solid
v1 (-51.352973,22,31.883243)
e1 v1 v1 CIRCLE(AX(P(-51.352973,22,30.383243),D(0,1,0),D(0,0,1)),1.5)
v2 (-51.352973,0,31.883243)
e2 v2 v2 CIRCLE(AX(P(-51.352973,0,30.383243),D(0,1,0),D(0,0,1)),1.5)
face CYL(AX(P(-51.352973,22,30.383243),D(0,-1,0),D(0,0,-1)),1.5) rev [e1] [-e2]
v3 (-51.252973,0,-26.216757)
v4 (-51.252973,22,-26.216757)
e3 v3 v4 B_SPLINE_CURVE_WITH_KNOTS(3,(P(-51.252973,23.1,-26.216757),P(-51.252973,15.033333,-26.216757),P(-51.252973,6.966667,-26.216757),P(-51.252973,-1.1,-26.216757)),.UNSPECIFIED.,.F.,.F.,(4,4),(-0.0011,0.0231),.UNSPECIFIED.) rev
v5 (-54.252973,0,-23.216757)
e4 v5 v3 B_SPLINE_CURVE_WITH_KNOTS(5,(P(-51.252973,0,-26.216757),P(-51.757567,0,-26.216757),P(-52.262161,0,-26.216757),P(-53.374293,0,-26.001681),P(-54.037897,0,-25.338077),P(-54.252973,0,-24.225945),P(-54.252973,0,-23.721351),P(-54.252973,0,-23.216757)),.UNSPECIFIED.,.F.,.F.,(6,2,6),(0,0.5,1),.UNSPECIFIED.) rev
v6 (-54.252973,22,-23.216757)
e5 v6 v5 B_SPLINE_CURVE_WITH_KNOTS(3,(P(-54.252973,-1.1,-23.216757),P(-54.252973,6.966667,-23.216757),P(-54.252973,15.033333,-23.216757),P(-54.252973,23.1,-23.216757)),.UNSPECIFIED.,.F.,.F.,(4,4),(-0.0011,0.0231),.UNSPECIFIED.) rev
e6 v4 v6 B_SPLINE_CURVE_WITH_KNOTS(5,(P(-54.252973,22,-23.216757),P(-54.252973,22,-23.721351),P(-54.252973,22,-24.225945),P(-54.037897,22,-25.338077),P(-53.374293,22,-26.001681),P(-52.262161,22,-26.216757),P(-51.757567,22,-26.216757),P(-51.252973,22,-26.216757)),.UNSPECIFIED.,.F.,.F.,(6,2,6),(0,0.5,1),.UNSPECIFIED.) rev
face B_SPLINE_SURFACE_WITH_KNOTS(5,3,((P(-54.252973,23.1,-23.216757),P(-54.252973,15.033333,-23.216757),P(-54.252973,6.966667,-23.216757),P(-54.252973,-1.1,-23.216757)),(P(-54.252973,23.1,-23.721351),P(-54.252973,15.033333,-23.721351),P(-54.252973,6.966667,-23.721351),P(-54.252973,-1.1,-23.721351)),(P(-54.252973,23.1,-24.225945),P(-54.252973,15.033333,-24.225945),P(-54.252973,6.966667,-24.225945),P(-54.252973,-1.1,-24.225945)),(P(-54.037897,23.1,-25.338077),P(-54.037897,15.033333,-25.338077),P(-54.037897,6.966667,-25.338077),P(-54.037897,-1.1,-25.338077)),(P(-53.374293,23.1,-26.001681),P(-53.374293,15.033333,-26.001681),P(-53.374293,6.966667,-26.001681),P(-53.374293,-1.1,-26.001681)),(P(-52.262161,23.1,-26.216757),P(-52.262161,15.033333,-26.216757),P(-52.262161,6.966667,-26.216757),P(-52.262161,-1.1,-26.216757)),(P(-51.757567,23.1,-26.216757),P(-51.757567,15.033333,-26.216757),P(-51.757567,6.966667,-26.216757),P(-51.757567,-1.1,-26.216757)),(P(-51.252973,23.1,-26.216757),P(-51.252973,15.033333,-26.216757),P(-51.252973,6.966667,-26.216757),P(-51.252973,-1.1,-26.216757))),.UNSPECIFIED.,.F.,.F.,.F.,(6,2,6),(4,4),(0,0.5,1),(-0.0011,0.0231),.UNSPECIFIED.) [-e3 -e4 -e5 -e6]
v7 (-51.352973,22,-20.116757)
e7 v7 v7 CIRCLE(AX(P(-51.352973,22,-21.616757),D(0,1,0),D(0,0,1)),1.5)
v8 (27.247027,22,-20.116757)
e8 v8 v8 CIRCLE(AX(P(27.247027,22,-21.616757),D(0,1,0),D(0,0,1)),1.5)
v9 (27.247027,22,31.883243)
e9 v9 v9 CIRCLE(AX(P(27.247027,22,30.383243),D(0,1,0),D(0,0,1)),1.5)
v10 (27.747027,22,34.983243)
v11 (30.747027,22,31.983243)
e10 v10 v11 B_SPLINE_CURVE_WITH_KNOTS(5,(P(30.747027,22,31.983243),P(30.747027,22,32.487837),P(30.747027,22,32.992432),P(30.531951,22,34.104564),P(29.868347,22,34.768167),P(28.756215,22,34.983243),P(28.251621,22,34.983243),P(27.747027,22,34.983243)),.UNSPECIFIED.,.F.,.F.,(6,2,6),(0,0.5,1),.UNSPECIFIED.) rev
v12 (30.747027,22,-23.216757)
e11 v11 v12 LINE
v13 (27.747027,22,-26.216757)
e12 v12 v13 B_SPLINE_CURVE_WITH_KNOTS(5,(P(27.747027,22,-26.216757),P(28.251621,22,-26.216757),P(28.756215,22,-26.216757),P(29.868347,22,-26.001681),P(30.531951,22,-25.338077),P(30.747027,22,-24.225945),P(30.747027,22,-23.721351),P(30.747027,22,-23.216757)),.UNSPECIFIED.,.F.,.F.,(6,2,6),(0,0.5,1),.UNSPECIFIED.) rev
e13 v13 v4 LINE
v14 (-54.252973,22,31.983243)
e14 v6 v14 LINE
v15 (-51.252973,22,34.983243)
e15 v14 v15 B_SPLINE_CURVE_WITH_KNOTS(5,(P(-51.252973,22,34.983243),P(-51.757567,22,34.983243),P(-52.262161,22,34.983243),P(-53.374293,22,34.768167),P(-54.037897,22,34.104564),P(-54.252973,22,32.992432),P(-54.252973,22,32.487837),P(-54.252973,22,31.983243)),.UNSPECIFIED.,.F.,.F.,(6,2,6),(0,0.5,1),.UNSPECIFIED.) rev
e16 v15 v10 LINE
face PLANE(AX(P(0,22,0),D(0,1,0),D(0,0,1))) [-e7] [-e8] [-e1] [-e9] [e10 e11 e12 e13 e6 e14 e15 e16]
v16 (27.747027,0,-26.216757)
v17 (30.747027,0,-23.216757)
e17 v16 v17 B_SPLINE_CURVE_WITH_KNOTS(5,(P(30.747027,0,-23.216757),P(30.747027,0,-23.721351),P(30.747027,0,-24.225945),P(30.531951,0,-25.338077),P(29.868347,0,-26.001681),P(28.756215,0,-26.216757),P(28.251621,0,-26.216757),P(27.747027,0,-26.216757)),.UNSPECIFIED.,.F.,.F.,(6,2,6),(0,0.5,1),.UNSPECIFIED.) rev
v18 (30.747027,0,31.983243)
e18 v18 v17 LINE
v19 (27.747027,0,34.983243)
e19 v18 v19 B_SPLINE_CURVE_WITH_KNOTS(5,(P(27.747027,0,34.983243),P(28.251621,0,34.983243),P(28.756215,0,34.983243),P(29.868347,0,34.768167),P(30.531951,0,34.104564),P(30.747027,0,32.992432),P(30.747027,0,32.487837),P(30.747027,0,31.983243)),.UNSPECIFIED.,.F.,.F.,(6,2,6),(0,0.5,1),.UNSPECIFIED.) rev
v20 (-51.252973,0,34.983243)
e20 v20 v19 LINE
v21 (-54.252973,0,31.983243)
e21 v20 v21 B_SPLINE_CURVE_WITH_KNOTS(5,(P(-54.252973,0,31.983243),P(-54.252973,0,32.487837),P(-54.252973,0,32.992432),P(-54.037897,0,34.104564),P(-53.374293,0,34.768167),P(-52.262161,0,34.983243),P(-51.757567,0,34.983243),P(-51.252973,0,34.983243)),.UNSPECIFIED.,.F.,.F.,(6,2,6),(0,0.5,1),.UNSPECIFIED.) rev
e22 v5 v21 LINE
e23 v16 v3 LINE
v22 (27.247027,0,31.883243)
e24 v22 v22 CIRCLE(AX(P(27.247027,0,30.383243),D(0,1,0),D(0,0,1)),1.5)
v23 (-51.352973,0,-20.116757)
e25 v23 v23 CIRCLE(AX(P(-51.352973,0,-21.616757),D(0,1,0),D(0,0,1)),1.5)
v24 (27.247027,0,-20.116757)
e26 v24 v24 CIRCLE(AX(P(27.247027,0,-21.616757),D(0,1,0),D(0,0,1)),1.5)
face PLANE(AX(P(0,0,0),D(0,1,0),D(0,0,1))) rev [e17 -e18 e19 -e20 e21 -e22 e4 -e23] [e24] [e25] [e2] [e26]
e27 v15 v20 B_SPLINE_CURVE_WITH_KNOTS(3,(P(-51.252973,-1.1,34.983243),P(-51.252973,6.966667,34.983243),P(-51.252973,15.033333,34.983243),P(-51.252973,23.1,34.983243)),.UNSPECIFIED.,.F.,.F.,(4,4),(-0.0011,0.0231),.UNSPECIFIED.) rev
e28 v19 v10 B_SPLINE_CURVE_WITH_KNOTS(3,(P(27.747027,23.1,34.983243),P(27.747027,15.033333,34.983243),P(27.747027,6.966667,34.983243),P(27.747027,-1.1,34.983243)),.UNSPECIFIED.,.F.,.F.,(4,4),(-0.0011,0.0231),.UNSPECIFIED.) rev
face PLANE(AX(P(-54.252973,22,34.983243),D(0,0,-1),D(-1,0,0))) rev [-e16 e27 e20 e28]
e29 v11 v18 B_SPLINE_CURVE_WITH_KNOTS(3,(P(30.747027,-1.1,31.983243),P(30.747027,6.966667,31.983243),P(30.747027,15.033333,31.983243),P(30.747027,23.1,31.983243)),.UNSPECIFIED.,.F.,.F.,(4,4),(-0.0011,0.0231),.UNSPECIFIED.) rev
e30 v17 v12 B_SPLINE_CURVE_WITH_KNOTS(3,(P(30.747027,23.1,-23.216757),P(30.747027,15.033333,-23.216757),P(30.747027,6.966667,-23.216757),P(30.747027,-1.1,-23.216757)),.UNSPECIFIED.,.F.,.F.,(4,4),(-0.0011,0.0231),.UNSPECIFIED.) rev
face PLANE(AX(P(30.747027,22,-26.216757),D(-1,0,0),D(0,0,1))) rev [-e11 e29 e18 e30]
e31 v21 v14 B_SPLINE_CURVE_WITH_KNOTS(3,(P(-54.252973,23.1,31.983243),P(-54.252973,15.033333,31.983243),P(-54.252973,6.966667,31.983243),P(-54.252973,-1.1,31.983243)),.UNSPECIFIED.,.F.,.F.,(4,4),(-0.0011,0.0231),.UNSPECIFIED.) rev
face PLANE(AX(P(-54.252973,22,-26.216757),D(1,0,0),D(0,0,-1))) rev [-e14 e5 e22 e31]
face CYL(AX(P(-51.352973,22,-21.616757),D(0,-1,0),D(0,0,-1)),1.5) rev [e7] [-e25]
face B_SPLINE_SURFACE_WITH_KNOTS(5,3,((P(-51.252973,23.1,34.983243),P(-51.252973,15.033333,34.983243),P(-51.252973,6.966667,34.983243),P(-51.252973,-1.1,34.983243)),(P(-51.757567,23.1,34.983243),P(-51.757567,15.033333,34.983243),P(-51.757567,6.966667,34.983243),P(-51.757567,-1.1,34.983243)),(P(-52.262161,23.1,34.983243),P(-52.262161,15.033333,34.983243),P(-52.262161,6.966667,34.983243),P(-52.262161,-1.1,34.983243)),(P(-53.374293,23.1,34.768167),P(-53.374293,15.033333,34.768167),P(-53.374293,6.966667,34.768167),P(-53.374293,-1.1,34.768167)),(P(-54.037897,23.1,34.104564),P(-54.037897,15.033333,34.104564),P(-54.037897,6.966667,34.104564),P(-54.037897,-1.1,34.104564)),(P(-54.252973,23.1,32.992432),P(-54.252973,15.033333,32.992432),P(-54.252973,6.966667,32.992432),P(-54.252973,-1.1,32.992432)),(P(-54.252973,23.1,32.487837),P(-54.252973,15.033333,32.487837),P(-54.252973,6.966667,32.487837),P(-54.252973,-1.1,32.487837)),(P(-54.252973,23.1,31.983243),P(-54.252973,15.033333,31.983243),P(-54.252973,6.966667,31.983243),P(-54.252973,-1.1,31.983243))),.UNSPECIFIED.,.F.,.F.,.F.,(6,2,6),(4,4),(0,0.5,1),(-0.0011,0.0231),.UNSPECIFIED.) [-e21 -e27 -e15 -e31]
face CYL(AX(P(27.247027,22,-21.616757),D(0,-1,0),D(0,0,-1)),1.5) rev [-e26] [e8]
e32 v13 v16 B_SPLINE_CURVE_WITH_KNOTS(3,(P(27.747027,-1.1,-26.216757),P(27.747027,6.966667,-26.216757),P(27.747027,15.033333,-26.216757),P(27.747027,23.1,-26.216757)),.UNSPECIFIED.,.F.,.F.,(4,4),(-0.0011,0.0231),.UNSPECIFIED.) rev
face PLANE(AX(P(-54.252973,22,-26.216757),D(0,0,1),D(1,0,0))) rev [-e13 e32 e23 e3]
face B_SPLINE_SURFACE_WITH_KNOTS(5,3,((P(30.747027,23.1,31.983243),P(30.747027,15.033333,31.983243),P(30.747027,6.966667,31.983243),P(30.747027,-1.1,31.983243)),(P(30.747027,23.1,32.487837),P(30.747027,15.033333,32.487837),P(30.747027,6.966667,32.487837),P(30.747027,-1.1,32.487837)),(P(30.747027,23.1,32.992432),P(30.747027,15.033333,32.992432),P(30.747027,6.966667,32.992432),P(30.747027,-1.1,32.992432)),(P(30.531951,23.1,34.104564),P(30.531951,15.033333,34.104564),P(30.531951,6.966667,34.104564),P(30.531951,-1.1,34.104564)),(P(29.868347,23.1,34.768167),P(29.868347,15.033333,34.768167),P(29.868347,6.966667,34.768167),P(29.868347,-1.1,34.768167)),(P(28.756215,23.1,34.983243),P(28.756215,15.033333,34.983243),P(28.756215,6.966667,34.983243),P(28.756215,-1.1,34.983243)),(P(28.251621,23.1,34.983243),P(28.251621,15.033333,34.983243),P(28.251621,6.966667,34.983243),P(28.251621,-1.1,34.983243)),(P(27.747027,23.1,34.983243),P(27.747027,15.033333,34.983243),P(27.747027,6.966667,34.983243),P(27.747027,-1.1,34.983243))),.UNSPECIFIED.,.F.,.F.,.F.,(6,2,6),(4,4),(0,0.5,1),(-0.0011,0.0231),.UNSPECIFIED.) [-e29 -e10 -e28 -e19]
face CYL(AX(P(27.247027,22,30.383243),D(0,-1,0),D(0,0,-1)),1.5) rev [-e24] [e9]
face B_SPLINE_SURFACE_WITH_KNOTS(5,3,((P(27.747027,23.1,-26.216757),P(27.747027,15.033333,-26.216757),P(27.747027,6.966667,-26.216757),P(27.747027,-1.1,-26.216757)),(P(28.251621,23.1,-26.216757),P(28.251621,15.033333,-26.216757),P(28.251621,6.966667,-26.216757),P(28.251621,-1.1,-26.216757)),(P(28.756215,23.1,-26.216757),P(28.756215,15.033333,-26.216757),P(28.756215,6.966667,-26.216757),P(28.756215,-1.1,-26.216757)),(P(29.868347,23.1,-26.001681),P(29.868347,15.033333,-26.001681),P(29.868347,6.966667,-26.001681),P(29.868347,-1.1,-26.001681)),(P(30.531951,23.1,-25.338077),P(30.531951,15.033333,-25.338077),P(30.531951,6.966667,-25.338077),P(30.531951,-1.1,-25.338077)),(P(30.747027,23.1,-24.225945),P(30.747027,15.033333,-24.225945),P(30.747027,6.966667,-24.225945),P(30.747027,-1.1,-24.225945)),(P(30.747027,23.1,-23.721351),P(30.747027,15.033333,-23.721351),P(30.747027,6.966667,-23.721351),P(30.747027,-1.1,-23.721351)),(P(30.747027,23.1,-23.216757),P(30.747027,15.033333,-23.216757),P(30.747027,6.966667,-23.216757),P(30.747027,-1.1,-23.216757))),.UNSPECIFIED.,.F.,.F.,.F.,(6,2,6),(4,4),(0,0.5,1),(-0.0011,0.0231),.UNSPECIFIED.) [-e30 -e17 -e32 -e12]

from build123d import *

# Parameters (mm, degrees)
SKETCH_1_W      = 85
SKETCH_1_H      = 61.2
SKETCH_1_R      = 1.5
EXTRUDE_1_DEPTH = 22
FILLET_1_SIZE   = 3


with BuildPart() as part:
    # 草图1 → 凸台-拉伸1 (new body)
    with BuildSketch(Plane(origin=(0, 0, 0), x_dir=(1, 0, 0), z_dir=(0, 1, 0))):
        with Locations((-11.752972973, -4.383243243)):
            Rectangle(SKETCH_1_W, SKETCH_1_H)
        with Locations(Location((-51.352972973, 21.616756757, 0), (0, 0, 270))):
            Circle(SKETCH_1_R, mode=Mode.SUBTRACT)
        with Locations(Location((-51.352972973, -30.383243243, 0), (0, 0, 270))):
            Circle(SKETCH_1_R, mode=Mode.SUBTRACT)
        with Locations(Location((27.247027027, 21.616756757, 0), (0, 0, 270))):
            Circle(SKETCH_1_R, mode=Mode.SUBTRACT)
        with Locations(Location((27.247027027, -30.383243243, 0), (0, 0, 270))):
            Circle(SKETCH_1_R, mode=Mode.SUBTRACT)
    extrude(amount=EXTRUDE_1_DEPTH)

    # 圆角1
    # a fillet whose section is not a circle: 3 mm, written as the material it takes off along each edge
    with BuildSketch(Plane(origin=(-54.252972973, -7.5, -26.216756757), x_dir=(1, 0, 0), z_dir=(0, 1, 0))) as fillet_1_piece_1:
        with BuildLine():
            add(Edge.make_bspline([(FILLET_1_SIZE, 0), (FILLET_1_SIZE * 0.831801948466, 0), (FILLET_1_SIZE * 0.663603896932, 0), (FILLET_1_SIZE * 0.292893218813, -FILLET_1_SIZE * 0.0716919198361), (FILLET_1_SIZE * 0.0716919198361, -FILLET_1_SIZE * 0.292893218813), (0, -FILLET_1_SIZE * 0.663603896932), (0, -FILLET_1_SIZE * 0.831801948466), (0, -FILLET_1_SIZE)], knots=[0, 0, 0, 0, 0, 0, 0.5, 0.5, 1, 1, 1, 1, 1, 1], degree=5))
            Line((0, -FILLET_1_SIZE), (0, 0))
            Line((0, 0), (FILLET_1_SIZE, 0))
        make_face()
    extrude(amount=37, mode=Mode.SUBTRACT)
    with BuildSketch(Plane(origin=(30.747027027, -7.5, -26.216756757), x_dir=(-1, 0, 0), z_dir=(0, 1, 0)), Plane(origin=(-54.252972973, -7.5, 34.983243243), x_dir=(1, 0, 0), z_dir=(0, 1, 0)), Plane(origin=(30.747027027, -7.5, 34.983243243), x_dir=(0, 0, -1), z_dir=(0, 1, 0))) as fillet_1_piece_2:
        with BuildLine():
            add(Edge.make_bspline([(FILLET_1_SIZE, 0), (FILLET_1_SIZE * 0.831801948466, 0), (FILLET_1_SIZE * 0.663603896932, 0), (FILLET_1_SIZE * 0.292893218813, FILLET_1_SIZE * 0.0716919198361), (FILLET_1_SIZE * 0.0716919198361, FILLET_1_SIZE * 0.292893218813), (0, FILLET_1_SIZE * 0.663603896932), (0, FILLET_1_SIZE * 0.831801948466), (0, FILLET_1_SIZE)], knots=[0, 0, 0, 0, 0, 0, 0.5, 0.5, 1, 1, 1, 1, 1, 1], degree=5))
            Line((0, FILLET_1_SIZE), (0, 0))
            Line((0, 0), (FILLET_1_SIZE, 0))
        make_face()
    extrude(amount=37, mode=Mode.SUBTRACT)


solid = part.part
